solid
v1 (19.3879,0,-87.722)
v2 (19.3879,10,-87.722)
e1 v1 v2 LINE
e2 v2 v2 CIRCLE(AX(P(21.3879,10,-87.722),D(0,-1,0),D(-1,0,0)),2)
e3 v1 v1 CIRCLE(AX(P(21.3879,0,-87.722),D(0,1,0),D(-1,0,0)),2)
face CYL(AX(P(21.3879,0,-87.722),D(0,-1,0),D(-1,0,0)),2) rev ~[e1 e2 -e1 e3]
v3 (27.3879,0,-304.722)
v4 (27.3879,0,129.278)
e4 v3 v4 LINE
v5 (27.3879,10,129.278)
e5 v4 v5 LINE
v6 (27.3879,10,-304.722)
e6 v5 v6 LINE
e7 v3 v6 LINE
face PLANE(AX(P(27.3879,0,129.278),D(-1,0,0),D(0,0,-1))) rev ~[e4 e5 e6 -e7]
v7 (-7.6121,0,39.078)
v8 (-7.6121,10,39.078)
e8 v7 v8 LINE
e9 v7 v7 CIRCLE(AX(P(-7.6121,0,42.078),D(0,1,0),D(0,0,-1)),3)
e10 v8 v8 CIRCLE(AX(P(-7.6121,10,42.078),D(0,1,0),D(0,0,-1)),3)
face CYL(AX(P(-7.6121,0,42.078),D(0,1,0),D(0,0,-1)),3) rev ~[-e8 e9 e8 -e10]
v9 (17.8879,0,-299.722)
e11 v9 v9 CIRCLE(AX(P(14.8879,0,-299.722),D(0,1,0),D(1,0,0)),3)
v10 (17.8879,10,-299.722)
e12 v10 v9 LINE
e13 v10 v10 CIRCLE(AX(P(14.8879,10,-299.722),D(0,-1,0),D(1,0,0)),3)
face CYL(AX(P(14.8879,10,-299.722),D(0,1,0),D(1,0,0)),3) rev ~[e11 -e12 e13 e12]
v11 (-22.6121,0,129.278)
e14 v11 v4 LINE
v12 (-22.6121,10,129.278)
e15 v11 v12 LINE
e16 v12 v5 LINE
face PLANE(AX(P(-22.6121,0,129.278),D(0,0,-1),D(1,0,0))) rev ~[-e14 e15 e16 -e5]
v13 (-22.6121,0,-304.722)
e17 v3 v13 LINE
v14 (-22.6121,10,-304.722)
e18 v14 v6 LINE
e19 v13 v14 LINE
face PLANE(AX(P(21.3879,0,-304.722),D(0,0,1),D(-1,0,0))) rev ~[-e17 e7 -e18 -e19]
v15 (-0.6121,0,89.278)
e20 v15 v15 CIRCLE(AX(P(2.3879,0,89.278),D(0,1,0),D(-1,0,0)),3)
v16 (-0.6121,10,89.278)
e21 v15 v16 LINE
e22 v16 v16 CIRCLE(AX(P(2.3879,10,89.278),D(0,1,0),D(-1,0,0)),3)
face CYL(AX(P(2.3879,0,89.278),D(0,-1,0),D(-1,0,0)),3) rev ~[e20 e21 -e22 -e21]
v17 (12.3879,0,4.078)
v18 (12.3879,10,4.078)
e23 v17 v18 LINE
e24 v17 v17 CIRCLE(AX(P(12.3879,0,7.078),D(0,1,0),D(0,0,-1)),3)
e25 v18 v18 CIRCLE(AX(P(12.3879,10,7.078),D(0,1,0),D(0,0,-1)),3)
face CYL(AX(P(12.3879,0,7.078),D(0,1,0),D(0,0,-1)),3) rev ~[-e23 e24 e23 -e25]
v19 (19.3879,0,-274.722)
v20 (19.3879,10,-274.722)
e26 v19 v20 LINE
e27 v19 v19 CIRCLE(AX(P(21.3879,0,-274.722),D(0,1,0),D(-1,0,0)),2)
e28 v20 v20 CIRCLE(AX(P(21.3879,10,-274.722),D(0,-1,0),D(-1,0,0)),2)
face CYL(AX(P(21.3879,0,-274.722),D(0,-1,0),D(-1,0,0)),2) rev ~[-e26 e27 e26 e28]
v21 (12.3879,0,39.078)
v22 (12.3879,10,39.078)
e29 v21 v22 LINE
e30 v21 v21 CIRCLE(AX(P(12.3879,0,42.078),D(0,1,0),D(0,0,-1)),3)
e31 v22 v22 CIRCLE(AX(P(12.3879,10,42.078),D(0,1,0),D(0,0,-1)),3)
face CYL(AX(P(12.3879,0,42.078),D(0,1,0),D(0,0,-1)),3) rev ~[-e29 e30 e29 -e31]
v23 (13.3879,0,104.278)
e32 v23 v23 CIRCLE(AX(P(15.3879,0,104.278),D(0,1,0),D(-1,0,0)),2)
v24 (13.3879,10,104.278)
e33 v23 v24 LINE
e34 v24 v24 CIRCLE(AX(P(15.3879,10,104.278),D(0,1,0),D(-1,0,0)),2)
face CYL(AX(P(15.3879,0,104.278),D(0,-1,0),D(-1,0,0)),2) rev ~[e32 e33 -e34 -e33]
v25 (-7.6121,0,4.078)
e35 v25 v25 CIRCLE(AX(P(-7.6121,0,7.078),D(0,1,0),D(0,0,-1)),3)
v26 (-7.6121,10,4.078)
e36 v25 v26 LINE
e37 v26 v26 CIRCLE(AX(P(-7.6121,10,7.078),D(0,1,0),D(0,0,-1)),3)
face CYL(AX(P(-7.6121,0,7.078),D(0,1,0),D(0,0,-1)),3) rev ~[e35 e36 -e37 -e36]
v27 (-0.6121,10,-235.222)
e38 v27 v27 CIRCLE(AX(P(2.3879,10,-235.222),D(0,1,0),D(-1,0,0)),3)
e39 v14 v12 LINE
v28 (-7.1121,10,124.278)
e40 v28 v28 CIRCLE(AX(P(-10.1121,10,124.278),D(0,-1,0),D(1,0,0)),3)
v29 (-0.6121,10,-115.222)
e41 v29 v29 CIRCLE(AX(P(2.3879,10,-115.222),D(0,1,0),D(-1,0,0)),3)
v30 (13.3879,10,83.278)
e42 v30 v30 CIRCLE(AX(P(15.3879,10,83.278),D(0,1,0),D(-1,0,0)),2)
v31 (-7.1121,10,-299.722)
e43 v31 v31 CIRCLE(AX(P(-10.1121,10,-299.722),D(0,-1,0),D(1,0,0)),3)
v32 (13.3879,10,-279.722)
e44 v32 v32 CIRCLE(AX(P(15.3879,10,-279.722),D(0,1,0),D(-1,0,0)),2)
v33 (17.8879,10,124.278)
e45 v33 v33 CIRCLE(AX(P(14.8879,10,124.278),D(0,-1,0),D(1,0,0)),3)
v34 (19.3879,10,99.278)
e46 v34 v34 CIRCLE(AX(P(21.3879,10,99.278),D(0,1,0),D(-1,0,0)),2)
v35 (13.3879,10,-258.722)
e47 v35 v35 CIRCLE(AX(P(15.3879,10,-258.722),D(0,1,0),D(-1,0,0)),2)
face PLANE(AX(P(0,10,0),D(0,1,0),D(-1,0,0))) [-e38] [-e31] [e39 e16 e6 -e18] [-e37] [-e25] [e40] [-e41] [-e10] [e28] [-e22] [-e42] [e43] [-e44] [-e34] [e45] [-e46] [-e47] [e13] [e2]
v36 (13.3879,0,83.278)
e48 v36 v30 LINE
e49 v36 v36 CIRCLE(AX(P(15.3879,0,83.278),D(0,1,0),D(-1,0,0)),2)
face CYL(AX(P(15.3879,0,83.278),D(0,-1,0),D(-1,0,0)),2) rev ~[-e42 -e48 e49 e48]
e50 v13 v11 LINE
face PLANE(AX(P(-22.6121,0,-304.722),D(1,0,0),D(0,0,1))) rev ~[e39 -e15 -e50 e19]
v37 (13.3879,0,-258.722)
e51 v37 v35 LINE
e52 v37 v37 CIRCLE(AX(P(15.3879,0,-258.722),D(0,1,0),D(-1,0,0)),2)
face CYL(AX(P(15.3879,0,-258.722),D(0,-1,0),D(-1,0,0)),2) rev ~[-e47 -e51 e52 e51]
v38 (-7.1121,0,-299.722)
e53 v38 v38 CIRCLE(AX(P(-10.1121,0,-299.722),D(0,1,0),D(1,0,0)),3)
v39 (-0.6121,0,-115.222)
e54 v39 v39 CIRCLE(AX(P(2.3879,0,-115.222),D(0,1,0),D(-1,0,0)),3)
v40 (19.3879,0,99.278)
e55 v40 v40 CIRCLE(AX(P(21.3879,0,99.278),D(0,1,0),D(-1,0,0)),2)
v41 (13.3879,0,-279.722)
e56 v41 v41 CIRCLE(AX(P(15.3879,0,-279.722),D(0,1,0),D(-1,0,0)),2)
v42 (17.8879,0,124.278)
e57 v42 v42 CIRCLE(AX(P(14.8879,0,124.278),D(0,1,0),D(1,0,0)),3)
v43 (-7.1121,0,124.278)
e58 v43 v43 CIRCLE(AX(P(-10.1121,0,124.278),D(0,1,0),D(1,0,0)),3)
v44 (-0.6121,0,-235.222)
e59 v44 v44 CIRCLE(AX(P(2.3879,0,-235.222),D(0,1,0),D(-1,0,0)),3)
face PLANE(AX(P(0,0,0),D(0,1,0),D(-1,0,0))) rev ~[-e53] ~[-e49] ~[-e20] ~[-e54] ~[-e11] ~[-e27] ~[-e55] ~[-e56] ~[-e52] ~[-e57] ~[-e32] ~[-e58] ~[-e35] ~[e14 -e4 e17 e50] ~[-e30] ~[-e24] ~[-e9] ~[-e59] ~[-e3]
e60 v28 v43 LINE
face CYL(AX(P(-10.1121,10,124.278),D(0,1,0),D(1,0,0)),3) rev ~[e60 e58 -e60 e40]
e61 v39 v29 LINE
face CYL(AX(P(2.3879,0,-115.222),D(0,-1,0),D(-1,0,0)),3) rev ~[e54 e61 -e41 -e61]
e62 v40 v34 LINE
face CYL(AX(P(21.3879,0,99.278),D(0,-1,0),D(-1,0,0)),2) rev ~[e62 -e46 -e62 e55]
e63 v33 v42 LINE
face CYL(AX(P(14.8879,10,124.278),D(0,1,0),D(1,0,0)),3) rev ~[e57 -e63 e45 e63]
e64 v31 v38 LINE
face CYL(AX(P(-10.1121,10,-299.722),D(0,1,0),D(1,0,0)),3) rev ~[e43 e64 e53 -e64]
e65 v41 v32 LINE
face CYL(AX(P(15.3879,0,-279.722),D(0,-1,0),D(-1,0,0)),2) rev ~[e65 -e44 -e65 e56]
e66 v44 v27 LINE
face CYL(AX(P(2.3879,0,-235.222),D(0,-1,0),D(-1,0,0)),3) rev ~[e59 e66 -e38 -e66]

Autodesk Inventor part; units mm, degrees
ref_plane "YZ Plane" through (0, 0, 0) normal (1, 0, 0) x (0, 1, 0)
ref_plane "XZ Plane" through (0, 0, 0) normal (0, 1, 0) x (-1, 0, 0)
ref_plane "XY Plane" through (0, 0, 0) normal (0, 0, 1) x (1, 0, 0)
sketch "Boceto1" plane through (0, 0, 0) normal (0, 1, 0) x (-1, 0, 0)
  line L0 (22.6121, 129.278) -> (-27.3879, 129.278)
  line L1 (-27.3879, 129.278) -> (-27.3879, -304.722)
  line L2 (-27.3879, -304.722) -> (22.6121, -304.722)
  line L3 (22.6121, -304.722) -> (22.6121, 129.278)
  circle A0 centre (-15.3879, 104.278) radius 2
  circle A1 centre (-15.3879, 83.278) radius 2
  line L4 (-27.3879, -87.722) -> (-4.9043, -87.722)
  circle A2 centre (-15.3879, -279.722) radius 2
  circle A3 centre (-15.3879, -258.722) radius 2
  line L5 (-27.3879, -304.722) -> (-21.3879, -304.722)
  line L6 (-21.3879, -304.722) -> (-21.3879, -274.722)
  circle A4 centre (-21.3879, -274.722) radius 2
  circle A5 centre (-21.3879, -87.722) radius 2
  circle A6 centre (-21.3879, 99.278) radius 2
  circle A7 centre (-2.3879, -235.222) radius 3
  circle A8 centre (-2.3879, -115.222) radius 3
  circle A9 centre (-2.3879, 89.278) radius 3
  dimension "d4" = 434
  dimension "d5" = 50
  dimension "d16" = 4
  dimension "d17" = 4
  dimension "d18" = 25
  dimension "d19" = 21
  dimension "d20" = 12
  dimension "d21" = 12
  dimension "d85" = 12
  dimension "d86" = 12
  dimension "d87" = 21
  dimension "d89" = 30
  dimension "d90" = 4
  dimension "d91" = 4
  dimension "d92" = 44
  dimension "d93" = 44
  dimension "d94" = 217
  dimension "d95" = 6
  dimension "d96" = 25
  dimension "d97" = 69.5
  dimension "d98" = 6
  dimension "d99" = 120
  dimension "d100" = 25
  dimension "d101" = 6
  dimension "d102" = 25
  dimension "d103" = 40
extrude "Extrusión1" add sketch "Boceto1" along normal blind 10
sketch "Boceto2" plane through (0, 10, 0) normal (0, 1, 0) x (1, 0, 0)
  line L0 (-22.6121, -129.278) -> (27.3879, -129.278) projected
  line L1 (-22.6121, -129.278) -> (-22.6121, -124.278)
  line L2 (-22.6121, 304.722) -> (-22.6121, -129.278) projected
  line L3 (-22.6121, -124.278) -> (27.3879, -124.278)
  line L4 (27.3879, -129.278) -> (27.3879, 304.722) projected
  line L5 (27.3879, 304.722) -> (-22.6121, 304.722) projected
  line L6 (-22.6121, 304.722) -> (-22.6121, 299.722)
  line L7 (-22.6121, 299.722) -> (27.3879, 299.722)
  line L8 (-22.6121, -124.278) -> (-10.1121, -124.278)
  line L9 (27.3879, 299.722) -> (14.8879, 299.722)
  circle A0 centre (-10.1121, -124.278) radius 3
  circle A1 centre (14.8879, -124.278) radius 3
  circle A2 centre (-10.1121, 299.722) radius 3
  circle A3 centre (14.8879, 299.722) radius 3
  dimension "d6" = 5
  dimension "d7" = 5
  dimension "d8" = 12.5
  dimension "d9" = 12.5
  dimension "d10" = 6
  dimension "d11" = 6
  dimension "d12" = 6
  dimension "d13" = 6
  dimension "d30" = 5
  dimension "d74" = 5
extrude "Extrusión2" cut sketch "Boceto2" against normal blind 20 contours A0 L3 | L3 A0 | A1 L3 | L3 A1 | A2 L7 | L7 A2 | A3 L7 | L7 A3
thread "Thread1" size "M4x0.7" class "6H" standard "ANSI Metric M Profile" length 40
thread "Thread2" size "M4x0.7" class "6H" standard "ANSI Metric M Profile" length 40
sketch "Boceto3" plane through (0, 0, 0) normal (0, -1, 0) x (1, 0, 0)
  line L0 (27.3879, 129.278) -> (27.3879, -304.722) projected
  line L1 (12.3879, 42.078) -> (-7.6121, 42.078)
  line L2 (-7.6121, 42.078) -> (-7.6121, 7.078)
  line L3 (-7.6121, 7.078) -> (12.3879, 7.078)
  line L4 (12.3879, 7.078) -> (12.3879, 42.078)
  circle A0 centre (12.3879, 7.078) radius 3
  circle A1 centre (-7.6121, 7.078) radius 3
  circle A2 centre (12.3879, 42.078) radius 3
  circle A3 centre (-7.6121, 42.078) radius 3
  line L5 (-22.6121, 129.278) -> (27.3879, 129.278) projected
  line L6 (-22.6121, -304.722) -> (-22.6121, 129.278) projected
  point P0 (-14161.5164, 17179.1084)
  point P1 (-14161.5164, 17617.1084)
  point P2 (-14211.5164, 17617.1084)
  point P3 (-14211.5164, 17179.1084)
  dimension "d58" = 35
  dimension "d59" = 15
  dimension "d60" = 87.2
  dimension "d61" = 15
  dimension "d62" = 20
hole "Agujero1" at (12.3879, 0, 42.078) at (-7.6121, 0, 42.078) at (12.3879, 0, 7.078) at (-7.6121, 0, 7.078) direction (0, 1, 0) diameter 6 depth 12 tip angle 118
thread "Rosca5" size "M4x0.7" class "6H" standard "ISO Metric profile" length 430
thread "Rosca6" size "M4x0.7" class "6H" standard "ISO Metric profile" length 430
thread "Rosca7" size "M6x1" class "6H" standard "ISO Metric profile" length 430
thread "Rosca8" size "M6x1" class "6H" standard "ISO Metric profile" length 430
thread "Rosca9" size "M6x1" class "6H" standard "ISO Metric profile" length 430
thread "Rosca10" size "M6x1" class "6H" standard "ISO Metric profile" length 430
thread "Rosca11" size "M4x0.7" class "6H" standard "ISO Metric profile" length 430
thread "Rosca12" size "M6x1" class "6H" standard "ISO Metric profile" length 100
thread "Rosca13" size "M6x1" class "6H" standard "ISO Metric profile" length 100
thread "Rosca14" size "M6x1" class "6H" standard "ISO Metric profile" length 100
equation "\"d100\" = d96"
equation "\"d102\" = d96"
properties part number "Lateral" material "Aluminio 6061"
